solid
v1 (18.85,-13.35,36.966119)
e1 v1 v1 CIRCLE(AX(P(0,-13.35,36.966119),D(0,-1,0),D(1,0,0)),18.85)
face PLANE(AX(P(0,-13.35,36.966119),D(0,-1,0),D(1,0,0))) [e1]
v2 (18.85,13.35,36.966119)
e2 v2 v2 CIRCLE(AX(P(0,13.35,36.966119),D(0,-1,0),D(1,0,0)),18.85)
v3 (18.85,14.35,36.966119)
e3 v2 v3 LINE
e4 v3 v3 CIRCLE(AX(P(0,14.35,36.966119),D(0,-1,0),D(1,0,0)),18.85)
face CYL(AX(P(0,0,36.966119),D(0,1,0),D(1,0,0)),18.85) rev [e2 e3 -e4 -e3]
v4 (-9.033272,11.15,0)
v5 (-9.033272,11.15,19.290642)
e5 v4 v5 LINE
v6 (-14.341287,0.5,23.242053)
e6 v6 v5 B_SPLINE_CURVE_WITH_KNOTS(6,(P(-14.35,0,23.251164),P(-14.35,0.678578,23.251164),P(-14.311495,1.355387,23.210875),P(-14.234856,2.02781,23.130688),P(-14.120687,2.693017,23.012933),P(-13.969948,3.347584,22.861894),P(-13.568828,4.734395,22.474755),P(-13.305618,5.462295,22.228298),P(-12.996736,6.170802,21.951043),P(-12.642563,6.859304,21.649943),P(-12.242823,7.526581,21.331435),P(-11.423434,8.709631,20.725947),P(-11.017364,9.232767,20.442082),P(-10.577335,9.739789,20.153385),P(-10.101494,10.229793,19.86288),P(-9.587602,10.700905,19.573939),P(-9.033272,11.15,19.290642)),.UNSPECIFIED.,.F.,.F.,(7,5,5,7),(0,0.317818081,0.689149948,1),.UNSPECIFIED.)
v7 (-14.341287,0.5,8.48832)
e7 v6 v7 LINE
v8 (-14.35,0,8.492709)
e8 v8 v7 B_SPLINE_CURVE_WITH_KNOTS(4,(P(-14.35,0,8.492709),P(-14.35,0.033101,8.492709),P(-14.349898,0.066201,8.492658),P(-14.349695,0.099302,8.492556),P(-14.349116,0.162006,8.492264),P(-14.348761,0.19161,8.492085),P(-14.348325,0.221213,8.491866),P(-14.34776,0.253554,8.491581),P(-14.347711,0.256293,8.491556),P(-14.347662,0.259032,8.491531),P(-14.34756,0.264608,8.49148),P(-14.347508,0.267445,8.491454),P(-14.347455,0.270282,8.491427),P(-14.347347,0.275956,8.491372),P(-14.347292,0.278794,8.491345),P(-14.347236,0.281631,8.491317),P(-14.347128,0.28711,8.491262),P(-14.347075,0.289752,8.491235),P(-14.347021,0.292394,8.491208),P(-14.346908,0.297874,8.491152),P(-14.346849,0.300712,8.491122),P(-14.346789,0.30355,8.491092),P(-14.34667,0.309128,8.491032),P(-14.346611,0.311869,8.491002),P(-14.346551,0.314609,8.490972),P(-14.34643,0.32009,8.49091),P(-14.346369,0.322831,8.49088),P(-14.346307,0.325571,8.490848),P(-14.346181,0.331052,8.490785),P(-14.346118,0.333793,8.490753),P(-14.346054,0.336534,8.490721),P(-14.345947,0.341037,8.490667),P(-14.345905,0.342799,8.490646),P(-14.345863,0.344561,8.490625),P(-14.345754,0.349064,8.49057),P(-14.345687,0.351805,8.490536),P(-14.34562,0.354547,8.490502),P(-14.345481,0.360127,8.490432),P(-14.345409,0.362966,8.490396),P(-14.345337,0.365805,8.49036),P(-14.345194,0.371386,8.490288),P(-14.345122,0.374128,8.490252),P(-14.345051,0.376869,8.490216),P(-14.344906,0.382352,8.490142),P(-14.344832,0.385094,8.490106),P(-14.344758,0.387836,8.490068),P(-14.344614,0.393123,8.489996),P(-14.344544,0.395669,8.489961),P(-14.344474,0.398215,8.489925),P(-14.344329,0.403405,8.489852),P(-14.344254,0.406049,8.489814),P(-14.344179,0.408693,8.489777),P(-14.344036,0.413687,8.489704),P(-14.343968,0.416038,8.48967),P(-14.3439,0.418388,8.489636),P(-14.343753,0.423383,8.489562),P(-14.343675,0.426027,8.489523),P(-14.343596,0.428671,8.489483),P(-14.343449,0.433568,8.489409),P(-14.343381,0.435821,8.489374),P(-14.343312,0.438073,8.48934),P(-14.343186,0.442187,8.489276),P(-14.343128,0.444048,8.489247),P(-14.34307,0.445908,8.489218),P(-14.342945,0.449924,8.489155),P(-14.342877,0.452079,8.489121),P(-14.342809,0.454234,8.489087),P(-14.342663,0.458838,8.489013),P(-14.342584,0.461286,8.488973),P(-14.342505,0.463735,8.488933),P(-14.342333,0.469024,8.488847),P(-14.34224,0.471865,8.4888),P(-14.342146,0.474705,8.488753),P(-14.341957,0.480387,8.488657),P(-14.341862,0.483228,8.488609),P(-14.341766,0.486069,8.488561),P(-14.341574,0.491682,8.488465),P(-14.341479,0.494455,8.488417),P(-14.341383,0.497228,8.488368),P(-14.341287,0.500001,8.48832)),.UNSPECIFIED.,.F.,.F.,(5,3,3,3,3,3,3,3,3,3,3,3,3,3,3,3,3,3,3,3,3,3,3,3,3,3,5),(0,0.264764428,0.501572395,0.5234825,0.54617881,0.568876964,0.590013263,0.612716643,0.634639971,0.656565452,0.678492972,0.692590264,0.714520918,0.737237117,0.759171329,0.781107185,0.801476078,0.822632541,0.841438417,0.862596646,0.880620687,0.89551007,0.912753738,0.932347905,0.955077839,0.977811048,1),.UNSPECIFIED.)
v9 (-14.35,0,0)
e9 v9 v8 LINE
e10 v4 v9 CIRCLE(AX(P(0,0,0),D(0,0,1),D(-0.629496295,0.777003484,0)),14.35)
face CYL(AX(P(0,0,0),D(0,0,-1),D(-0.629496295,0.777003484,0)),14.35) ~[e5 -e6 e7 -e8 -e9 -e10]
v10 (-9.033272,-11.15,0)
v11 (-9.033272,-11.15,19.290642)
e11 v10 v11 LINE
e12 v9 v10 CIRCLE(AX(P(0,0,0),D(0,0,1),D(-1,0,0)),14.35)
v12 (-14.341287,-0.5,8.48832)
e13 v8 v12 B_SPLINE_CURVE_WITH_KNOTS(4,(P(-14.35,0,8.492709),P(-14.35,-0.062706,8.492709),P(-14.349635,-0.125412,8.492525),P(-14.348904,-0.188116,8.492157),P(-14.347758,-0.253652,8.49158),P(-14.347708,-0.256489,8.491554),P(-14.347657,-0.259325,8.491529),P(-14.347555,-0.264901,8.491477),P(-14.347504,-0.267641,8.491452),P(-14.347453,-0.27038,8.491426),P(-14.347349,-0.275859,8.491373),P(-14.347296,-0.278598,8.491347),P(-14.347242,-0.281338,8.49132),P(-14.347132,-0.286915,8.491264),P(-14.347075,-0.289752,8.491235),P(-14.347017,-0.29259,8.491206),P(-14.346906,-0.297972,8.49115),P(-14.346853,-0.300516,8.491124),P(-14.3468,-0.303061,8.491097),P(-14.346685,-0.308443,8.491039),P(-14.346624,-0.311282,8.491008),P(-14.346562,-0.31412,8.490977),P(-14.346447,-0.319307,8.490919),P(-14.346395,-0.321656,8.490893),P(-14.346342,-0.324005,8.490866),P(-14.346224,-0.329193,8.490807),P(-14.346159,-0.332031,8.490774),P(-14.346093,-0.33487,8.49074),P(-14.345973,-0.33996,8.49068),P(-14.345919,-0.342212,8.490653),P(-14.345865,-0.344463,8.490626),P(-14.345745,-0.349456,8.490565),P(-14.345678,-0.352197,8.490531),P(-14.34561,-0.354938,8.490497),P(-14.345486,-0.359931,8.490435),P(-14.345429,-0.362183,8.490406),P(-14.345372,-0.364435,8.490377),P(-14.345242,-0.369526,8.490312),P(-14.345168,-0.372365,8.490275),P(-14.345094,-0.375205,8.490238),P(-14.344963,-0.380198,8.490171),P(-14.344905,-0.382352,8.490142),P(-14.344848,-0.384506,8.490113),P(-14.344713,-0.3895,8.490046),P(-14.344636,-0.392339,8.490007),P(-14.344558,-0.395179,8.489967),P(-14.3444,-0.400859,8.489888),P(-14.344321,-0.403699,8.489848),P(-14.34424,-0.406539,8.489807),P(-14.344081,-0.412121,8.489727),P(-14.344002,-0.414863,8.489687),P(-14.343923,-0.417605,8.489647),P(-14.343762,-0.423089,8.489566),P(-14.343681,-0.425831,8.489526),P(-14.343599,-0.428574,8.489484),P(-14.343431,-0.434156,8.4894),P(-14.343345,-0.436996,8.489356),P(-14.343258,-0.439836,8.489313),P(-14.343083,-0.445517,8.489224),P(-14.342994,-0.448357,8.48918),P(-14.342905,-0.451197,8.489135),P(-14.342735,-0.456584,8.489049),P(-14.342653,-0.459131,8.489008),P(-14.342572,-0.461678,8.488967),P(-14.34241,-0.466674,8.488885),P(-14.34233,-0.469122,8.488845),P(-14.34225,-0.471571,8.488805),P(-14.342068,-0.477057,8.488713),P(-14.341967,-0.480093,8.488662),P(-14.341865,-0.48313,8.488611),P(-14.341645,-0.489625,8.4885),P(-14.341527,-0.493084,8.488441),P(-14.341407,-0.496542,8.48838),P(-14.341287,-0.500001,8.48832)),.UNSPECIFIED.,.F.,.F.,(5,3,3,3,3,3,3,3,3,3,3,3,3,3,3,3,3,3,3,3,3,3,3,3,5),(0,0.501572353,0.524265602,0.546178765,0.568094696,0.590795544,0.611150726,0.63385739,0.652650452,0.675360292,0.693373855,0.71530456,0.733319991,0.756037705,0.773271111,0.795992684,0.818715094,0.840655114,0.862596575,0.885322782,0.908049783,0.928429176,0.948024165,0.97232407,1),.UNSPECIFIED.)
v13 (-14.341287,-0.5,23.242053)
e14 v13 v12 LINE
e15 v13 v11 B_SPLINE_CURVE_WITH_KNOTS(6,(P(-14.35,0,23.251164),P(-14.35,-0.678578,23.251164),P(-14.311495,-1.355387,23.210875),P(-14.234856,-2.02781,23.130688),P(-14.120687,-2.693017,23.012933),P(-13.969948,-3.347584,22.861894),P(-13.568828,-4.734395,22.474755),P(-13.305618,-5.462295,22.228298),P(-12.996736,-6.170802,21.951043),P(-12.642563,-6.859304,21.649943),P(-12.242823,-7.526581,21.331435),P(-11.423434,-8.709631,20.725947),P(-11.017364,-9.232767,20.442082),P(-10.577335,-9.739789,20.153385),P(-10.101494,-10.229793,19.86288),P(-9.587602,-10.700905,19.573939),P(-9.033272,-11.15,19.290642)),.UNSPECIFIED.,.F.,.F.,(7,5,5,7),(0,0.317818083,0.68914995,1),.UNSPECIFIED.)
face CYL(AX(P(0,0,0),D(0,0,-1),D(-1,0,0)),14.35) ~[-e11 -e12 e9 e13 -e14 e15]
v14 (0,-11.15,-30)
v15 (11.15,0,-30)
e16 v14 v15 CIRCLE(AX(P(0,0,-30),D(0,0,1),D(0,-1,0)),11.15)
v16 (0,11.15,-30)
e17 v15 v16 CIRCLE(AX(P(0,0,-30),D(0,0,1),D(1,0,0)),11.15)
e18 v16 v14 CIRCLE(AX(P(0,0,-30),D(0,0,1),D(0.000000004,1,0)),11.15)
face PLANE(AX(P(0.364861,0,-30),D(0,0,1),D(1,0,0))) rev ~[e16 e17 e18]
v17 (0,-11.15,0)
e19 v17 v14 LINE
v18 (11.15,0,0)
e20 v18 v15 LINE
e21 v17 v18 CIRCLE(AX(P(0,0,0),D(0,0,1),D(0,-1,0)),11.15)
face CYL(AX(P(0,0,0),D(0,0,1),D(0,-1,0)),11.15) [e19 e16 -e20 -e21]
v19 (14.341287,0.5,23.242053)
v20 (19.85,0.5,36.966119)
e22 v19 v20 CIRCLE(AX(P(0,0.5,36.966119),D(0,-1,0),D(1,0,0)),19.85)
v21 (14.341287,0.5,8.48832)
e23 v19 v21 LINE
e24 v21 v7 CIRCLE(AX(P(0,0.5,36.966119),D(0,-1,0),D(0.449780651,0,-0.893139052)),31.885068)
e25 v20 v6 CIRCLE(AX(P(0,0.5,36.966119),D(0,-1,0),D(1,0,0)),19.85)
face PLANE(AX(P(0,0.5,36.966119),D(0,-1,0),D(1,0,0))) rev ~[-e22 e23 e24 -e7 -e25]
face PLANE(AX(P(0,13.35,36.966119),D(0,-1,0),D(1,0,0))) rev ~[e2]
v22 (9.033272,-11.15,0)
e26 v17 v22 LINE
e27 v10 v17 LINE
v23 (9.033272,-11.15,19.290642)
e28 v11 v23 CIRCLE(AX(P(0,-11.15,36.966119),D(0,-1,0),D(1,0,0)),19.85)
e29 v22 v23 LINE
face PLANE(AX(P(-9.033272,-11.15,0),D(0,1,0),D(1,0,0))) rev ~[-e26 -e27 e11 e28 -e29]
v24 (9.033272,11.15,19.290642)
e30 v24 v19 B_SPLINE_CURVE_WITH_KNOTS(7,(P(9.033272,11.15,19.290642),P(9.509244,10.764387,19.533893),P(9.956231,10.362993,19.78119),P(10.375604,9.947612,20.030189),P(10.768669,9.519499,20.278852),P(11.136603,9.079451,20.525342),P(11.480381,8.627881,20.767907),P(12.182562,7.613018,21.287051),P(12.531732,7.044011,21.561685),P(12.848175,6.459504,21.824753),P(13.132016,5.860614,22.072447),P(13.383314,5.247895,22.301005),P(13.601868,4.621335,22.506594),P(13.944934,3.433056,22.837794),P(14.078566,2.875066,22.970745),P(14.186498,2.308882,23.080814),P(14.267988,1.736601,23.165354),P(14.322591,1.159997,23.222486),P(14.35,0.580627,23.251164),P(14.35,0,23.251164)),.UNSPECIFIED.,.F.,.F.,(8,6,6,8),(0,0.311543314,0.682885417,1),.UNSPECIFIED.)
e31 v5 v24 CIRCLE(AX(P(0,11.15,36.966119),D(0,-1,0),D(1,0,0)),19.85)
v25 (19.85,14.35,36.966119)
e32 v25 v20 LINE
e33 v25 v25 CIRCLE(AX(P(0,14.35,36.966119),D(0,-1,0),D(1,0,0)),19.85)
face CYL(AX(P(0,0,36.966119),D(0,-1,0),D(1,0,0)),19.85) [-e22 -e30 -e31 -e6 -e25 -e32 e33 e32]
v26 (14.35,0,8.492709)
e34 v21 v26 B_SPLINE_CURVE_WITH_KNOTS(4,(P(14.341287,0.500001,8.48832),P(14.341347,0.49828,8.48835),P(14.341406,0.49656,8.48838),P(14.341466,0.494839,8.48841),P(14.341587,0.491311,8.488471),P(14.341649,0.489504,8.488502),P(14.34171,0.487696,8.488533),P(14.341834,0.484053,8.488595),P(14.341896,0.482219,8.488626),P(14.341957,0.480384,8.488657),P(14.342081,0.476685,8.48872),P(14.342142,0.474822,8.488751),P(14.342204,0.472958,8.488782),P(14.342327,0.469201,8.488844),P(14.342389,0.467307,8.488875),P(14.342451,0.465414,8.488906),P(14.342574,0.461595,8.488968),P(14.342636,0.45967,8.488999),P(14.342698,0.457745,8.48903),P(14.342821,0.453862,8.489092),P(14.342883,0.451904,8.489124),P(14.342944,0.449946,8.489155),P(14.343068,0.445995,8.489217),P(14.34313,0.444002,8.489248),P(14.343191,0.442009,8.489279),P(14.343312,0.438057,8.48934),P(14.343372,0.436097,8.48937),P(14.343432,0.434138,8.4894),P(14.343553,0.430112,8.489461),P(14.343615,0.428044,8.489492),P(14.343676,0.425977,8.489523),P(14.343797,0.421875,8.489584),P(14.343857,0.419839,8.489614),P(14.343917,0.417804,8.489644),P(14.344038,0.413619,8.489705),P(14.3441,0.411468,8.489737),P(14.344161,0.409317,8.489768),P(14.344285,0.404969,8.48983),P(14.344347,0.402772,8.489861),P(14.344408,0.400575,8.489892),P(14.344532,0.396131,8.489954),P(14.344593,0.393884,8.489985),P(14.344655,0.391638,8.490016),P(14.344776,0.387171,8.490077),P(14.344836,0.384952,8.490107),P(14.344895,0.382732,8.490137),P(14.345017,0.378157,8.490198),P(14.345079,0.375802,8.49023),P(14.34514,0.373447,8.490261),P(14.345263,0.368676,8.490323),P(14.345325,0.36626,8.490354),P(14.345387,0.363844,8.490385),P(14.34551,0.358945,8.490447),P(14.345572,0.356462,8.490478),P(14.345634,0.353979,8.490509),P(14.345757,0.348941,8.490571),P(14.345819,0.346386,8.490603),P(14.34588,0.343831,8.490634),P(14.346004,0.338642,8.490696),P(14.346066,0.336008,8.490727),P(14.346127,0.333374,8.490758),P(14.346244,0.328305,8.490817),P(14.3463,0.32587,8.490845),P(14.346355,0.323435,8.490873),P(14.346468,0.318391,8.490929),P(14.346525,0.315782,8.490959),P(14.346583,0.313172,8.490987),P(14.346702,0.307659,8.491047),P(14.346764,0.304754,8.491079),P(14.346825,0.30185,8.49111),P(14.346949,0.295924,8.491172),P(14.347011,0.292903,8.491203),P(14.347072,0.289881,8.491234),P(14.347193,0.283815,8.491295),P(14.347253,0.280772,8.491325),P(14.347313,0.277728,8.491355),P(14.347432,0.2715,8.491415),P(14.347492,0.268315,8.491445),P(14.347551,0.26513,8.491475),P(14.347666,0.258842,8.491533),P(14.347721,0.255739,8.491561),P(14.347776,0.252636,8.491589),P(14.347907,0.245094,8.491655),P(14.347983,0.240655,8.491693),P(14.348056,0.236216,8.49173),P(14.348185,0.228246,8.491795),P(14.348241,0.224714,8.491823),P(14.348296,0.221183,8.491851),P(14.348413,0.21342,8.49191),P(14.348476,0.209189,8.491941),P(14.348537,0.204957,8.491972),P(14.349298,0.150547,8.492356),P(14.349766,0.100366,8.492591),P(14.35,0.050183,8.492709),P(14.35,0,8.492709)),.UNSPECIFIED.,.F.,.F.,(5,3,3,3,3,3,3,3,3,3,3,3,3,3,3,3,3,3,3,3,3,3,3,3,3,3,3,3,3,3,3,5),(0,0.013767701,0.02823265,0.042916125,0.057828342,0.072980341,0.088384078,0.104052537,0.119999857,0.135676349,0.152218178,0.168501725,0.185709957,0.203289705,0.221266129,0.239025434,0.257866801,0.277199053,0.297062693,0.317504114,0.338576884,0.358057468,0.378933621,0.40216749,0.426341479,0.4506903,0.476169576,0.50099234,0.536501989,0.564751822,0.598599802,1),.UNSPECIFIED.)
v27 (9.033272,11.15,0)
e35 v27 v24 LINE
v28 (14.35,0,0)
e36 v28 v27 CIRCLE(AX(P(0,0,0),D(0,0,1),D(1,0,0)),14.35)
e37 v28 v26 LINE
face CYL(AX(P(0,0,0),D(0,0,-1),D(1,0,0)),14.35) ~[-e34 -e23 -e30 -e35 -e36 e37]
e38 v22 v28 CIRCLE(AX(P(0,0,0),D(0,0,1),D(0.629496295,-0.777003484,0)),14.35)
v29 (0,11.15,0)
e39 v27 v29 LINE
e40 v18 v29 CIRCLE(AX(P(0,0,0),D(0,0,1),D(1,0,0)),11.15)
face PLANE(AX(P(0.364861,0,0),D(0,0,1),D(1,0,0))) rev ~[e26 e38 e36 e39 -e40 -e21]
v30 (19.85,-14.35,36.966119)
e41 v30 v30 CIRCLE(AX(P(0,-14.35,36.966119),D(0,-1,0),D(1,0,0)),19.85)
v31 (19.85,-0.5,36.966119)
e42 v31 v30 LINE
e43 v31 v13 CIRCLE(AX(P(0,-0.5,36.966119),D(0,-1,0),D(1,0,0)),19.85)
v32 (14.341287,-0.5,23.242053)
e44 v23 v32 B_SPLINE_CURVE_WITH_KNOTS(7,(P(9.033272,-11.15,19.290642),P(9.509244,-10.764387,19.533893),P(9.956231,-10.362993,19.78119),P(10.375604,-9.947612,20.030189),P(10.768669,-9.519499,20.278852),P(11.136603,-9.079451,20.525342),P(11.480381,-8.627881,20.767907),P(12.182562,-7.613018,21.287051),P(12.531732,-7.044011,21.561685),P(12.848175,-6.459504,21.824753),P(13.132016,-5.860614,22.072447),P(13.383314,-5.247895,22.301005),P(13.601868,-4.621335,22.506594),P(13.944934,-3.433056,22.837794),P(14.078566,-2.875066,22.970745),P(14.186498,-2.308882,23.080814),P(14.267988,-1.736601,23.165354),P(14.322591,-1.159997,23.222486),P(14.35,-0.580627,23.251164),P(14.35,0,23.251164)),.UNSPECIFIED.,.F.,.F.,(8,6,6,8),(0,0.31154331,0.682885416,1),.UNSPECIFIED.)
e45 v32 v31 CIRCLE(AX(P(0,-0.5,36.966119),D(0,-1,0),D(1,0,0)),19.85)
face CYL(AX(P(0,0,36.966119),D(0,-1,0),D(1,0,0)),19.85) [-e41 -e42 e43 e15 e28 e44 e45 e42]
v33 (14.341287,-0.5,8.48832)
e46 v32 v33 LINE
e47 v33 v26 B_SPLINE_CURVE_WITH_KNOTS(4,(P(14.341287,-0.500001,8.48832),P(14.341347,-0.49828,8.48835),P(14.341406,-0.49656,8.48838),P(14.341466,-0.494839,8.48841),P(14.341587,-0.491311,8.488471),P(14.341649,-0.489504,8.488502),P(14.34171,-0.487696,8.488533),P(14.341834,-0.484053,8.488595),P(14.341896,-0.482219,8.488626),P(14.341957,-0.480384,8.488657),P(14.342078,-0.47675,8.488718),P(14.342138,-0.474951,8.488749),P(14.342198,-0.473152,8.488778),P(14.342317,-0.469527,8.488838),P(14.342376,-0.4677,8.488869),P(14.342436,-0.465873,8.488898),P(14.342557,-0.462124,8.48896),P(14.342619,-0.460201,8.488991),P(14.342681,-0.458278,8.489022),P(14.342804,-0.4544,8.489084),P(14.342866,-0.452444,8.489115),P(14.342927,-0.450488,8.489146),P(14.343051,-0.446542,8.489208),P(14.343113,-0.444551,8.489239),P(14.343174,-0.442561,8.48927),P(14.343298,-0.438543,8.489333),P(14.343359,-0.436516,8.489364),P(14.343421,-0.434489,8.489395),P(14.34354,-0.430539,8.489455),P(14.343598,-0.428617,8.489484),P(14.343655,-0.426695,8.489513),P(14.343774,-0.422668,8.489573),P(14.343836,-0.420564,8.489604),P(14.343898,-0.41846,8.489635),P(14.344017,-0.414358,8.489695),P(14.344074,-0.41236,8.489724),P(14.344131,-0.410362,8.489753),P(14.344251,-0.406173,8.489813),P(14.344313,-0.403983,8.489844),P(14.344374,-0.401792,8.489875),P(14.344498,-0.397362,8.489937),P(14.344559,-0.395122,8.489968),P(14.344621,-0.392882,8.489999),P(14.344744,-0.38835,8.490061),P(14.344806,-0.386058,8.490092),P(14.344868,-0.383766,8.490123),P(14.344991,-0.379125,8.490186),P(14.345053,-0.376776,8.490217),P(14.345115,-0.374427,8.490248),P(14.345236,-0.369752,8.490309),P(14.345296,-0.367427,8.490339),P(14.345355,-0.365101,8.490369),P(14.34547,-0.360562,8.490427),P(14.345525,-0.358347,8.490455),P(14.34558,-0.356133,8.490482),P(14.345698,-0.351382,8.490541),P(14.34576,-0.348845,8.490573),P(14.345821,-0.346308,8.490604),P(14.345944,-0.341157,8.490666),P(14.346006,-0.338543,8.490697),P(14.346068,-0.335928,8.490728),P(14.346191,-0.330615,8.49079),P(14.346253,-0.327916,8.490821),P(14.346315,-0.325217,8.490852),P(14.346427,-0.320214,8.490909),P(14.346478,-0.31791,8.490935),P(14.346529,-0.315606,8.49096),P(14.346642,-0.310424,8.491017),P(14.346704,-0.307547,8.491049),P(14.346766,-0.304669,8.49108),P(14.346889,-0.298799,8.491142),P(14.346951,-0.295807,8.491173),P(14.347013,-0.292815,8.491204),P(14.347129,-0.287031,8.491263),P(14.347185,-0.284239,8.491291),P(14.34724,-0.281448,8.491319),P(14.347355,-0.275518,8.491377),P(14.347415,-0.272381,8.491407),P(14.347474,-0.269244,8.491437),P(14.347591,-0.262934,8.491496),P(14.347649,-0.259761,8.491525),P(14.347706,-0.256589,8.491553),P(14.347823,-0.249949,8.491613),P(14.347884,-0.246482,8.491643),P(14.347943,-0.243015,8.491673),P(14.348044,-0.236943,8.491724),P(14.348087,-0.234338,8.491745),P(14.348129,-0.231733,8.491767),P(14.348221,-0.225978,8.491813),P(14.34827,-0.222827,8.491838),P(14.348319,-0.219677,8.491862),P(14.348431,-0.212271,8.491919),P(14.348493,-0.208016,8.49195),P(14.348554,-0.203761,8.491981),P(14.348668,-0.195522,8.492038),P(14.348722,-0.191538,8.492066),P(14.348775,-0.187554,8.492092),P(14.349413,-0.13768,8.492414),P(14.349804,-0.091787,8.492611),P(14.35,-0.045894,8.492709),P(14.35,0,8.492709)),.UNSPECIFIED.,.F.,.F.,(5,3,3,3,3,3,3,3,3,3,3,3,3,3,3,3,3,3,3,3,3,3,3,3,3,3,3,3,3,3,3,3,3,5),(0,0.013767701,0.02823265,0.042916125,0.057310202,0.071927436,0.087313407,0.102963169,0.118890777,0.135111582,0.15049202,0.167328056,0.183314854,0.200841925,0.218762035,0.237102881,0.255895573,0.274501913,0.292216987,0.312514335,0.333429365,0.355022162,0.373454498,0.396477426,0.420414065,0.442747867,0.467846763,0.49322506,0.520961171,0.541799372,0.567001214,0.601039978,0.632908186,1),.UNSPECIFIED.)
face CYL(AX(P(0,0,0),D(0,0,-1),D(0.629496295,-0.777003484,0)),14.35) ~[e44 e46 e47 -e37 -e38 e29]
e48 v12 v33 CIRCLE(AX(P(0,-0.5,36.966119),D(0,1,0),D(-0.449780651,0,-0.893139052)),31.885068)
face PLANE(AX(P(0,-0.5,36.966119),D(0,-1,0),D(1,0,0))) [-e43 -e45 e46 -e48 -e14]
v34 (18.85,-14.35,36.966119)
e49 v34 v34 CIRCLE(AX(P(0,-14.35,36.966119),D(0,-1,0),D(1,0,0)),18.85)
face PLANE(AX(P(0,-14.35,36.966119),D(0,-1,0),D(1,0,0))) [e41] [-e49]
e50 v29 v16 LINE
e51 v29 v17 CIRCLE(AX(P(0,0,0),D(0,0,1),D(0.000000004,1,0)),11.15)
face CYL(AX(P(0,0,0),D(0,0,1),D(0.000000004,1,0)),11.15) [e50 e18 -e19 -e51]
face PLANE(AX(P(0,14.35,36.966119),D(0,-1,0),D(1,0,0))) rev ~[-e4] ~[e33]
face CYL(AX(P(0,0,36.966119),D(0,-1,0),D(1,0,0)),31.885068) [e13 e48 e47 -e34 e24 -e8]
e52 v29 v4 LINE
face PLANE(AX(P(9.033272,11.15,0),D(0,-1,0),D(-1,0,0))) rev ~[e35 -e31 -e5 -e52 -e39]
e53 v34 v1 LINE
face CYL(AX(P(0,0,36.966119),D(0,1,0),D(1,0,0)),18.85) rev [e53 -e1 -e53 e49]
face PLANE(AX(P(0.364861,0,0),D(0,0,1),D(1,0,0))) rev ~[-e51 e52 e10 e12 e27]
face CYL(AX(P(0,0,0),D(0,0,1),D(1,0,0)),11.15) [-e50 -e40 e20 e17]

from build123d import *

# Parameters (mm, degrees)
F1_R     = 18.85
F2_DEPTH = 13.35
F1_R_2   = 19.85
F3_DEPTH = 14.35
F4_DEPTH = 34.2
F5_DEPTH = 30
F6_DEPTH = 20.9
F1_R_3   = 31.8850678314
F8_DEPTH = 0.5


with BuildPart() as f2:
    # F1 (on Front) → F2 (new body, symmetric)
    with BuildSketch(Plane.XZ):
        with Locations((0, 36.9661189616)):
            Circle(F1_R)
    extrude(amount=F2_DEPTH, both=True)

    # F1 (on Front) → F3 (join, symmetric)
    with BuildSketch(Plane.XZ):
        with Locations((0, 36.9661189616)):
            Circle(F1_R_2)
        with Locations((0, 36.9661189616)):
            Circle(F1_R, mode=Mode.SUBTRACT)
    extrude(amount=F3_DEPTH, both=True)



with BuildPart() as f4:
    # F0 (on Top) → F4 (new body)
    with BuildSketch(Plane.XY):
        with BuildLine():
            ThreePointArc((5.4e-09, -11.15), (7.8842406121, -7.8842406083), (11.15, 0))
            ThreePointArc((11.15, 0), (7.8842406263, 7.8842405941), (4.56e-08, 11.15))
            ThreePointArc((4.56e-08, 11.15), (-11.15, 2.01e-08), (5.4e-09, -11.15))
        make_face()
        with BuildLine():
            ThreePointArc((4.56e-08, 11.15), (7.8842406263, 7.8842405941), (11.15, 0))
            ThreePointArc((11.15, 0), (7.8842406121, -7.8842406083), (5.4e-09, -11.15))
            Line((5.4e-09, -11.15), (9.0332718325, -11.15))
            ThreePointArc((9.0332718325, -11.15), (12.9527979757, -6.1763682372), (14.35, 0))
            ThreePointArc((14.35, 0), (12.9527979757, 6.1763682372), (9.0332718325, 11.15))
            Line((9.0332718325, 11.15), (4.56e-08, 11.15))
        make_face()
        with BuildLine():
            ThreePointArc((5.4e-09, -11.15), (-11.15, 2.01e-08), (4.56e-08, 11.15))
            Line((4.56e-08, 11.15), (-9.0332718325, 11.15))
            ThreePointArc((-9.0332718325, 11.15), (-12.9527979757, 6.1763682372), (-14.35, 0))
            ThreePointArc((-14.35, 0), (-12.9527979757, -6.1763682372), (-9.0332718325, -11.15))
            Line((-9.0332718325, -11.15), (5.4e-09, -11.15))
        make_face()
    extrude(amount=F4_DEPTH)

    # F0 (on Top) → F5 (join)
    with BuildSketch(Plane.XY):
        with BuildLine():
            ThreePointArc((5.4e-09, -11.15), (7.8842406121, -7.8842406083), (11.15, 0))
            ThreePointArc((11.15, 0), (7.8842406263, 7.8842405941), (4.56e-08, 11.15))
            ThreePointArc((4.56e-08, 11.15), (-11.15, 2.01e-08), (5.4e-09, -11.15))
        make_face()
    extrude(amount=-F5_DEPTH)


with BuildPart() as f6:
    # F1 (on Front) → F6 (new body, symmetric)
    with BuildSketch(Plane.XZ):
        with Locations((0, 36.9661189616)):
            Circle(F1_R_2)
        with Locations((0, 36.9661189616)):
            Circle(F1_R, mode=Mode.SUBTRACT)
        with Locations((0, 36.9661189616)):
            Circle(F1_R)
    extrude(amount=F6_DEPTH, both=True)


with BuildPart() as f4_1:
    add(f4.part)

    # F7: cut F6
    add(f6.part, mode=Mode.SUBTRACT)


with BuildPart() as f2_1:
    add(f2.part)

    add(f4_1.part)  # F8 merges F4
    # F1 (on Front) → F8 (join, symmetric)
    with BuildSketch(Plane.XZ):
        with Locations((0, 36.9661189616)):
            Circle(F1_R_3)
        with Locations((0, 36.9661189616)):
            Circle(F1_R_2, mode=Mode.SUBTRACT)
    extrude(amount=F8_DEPTH, both=True)


solid = f2_1.part
